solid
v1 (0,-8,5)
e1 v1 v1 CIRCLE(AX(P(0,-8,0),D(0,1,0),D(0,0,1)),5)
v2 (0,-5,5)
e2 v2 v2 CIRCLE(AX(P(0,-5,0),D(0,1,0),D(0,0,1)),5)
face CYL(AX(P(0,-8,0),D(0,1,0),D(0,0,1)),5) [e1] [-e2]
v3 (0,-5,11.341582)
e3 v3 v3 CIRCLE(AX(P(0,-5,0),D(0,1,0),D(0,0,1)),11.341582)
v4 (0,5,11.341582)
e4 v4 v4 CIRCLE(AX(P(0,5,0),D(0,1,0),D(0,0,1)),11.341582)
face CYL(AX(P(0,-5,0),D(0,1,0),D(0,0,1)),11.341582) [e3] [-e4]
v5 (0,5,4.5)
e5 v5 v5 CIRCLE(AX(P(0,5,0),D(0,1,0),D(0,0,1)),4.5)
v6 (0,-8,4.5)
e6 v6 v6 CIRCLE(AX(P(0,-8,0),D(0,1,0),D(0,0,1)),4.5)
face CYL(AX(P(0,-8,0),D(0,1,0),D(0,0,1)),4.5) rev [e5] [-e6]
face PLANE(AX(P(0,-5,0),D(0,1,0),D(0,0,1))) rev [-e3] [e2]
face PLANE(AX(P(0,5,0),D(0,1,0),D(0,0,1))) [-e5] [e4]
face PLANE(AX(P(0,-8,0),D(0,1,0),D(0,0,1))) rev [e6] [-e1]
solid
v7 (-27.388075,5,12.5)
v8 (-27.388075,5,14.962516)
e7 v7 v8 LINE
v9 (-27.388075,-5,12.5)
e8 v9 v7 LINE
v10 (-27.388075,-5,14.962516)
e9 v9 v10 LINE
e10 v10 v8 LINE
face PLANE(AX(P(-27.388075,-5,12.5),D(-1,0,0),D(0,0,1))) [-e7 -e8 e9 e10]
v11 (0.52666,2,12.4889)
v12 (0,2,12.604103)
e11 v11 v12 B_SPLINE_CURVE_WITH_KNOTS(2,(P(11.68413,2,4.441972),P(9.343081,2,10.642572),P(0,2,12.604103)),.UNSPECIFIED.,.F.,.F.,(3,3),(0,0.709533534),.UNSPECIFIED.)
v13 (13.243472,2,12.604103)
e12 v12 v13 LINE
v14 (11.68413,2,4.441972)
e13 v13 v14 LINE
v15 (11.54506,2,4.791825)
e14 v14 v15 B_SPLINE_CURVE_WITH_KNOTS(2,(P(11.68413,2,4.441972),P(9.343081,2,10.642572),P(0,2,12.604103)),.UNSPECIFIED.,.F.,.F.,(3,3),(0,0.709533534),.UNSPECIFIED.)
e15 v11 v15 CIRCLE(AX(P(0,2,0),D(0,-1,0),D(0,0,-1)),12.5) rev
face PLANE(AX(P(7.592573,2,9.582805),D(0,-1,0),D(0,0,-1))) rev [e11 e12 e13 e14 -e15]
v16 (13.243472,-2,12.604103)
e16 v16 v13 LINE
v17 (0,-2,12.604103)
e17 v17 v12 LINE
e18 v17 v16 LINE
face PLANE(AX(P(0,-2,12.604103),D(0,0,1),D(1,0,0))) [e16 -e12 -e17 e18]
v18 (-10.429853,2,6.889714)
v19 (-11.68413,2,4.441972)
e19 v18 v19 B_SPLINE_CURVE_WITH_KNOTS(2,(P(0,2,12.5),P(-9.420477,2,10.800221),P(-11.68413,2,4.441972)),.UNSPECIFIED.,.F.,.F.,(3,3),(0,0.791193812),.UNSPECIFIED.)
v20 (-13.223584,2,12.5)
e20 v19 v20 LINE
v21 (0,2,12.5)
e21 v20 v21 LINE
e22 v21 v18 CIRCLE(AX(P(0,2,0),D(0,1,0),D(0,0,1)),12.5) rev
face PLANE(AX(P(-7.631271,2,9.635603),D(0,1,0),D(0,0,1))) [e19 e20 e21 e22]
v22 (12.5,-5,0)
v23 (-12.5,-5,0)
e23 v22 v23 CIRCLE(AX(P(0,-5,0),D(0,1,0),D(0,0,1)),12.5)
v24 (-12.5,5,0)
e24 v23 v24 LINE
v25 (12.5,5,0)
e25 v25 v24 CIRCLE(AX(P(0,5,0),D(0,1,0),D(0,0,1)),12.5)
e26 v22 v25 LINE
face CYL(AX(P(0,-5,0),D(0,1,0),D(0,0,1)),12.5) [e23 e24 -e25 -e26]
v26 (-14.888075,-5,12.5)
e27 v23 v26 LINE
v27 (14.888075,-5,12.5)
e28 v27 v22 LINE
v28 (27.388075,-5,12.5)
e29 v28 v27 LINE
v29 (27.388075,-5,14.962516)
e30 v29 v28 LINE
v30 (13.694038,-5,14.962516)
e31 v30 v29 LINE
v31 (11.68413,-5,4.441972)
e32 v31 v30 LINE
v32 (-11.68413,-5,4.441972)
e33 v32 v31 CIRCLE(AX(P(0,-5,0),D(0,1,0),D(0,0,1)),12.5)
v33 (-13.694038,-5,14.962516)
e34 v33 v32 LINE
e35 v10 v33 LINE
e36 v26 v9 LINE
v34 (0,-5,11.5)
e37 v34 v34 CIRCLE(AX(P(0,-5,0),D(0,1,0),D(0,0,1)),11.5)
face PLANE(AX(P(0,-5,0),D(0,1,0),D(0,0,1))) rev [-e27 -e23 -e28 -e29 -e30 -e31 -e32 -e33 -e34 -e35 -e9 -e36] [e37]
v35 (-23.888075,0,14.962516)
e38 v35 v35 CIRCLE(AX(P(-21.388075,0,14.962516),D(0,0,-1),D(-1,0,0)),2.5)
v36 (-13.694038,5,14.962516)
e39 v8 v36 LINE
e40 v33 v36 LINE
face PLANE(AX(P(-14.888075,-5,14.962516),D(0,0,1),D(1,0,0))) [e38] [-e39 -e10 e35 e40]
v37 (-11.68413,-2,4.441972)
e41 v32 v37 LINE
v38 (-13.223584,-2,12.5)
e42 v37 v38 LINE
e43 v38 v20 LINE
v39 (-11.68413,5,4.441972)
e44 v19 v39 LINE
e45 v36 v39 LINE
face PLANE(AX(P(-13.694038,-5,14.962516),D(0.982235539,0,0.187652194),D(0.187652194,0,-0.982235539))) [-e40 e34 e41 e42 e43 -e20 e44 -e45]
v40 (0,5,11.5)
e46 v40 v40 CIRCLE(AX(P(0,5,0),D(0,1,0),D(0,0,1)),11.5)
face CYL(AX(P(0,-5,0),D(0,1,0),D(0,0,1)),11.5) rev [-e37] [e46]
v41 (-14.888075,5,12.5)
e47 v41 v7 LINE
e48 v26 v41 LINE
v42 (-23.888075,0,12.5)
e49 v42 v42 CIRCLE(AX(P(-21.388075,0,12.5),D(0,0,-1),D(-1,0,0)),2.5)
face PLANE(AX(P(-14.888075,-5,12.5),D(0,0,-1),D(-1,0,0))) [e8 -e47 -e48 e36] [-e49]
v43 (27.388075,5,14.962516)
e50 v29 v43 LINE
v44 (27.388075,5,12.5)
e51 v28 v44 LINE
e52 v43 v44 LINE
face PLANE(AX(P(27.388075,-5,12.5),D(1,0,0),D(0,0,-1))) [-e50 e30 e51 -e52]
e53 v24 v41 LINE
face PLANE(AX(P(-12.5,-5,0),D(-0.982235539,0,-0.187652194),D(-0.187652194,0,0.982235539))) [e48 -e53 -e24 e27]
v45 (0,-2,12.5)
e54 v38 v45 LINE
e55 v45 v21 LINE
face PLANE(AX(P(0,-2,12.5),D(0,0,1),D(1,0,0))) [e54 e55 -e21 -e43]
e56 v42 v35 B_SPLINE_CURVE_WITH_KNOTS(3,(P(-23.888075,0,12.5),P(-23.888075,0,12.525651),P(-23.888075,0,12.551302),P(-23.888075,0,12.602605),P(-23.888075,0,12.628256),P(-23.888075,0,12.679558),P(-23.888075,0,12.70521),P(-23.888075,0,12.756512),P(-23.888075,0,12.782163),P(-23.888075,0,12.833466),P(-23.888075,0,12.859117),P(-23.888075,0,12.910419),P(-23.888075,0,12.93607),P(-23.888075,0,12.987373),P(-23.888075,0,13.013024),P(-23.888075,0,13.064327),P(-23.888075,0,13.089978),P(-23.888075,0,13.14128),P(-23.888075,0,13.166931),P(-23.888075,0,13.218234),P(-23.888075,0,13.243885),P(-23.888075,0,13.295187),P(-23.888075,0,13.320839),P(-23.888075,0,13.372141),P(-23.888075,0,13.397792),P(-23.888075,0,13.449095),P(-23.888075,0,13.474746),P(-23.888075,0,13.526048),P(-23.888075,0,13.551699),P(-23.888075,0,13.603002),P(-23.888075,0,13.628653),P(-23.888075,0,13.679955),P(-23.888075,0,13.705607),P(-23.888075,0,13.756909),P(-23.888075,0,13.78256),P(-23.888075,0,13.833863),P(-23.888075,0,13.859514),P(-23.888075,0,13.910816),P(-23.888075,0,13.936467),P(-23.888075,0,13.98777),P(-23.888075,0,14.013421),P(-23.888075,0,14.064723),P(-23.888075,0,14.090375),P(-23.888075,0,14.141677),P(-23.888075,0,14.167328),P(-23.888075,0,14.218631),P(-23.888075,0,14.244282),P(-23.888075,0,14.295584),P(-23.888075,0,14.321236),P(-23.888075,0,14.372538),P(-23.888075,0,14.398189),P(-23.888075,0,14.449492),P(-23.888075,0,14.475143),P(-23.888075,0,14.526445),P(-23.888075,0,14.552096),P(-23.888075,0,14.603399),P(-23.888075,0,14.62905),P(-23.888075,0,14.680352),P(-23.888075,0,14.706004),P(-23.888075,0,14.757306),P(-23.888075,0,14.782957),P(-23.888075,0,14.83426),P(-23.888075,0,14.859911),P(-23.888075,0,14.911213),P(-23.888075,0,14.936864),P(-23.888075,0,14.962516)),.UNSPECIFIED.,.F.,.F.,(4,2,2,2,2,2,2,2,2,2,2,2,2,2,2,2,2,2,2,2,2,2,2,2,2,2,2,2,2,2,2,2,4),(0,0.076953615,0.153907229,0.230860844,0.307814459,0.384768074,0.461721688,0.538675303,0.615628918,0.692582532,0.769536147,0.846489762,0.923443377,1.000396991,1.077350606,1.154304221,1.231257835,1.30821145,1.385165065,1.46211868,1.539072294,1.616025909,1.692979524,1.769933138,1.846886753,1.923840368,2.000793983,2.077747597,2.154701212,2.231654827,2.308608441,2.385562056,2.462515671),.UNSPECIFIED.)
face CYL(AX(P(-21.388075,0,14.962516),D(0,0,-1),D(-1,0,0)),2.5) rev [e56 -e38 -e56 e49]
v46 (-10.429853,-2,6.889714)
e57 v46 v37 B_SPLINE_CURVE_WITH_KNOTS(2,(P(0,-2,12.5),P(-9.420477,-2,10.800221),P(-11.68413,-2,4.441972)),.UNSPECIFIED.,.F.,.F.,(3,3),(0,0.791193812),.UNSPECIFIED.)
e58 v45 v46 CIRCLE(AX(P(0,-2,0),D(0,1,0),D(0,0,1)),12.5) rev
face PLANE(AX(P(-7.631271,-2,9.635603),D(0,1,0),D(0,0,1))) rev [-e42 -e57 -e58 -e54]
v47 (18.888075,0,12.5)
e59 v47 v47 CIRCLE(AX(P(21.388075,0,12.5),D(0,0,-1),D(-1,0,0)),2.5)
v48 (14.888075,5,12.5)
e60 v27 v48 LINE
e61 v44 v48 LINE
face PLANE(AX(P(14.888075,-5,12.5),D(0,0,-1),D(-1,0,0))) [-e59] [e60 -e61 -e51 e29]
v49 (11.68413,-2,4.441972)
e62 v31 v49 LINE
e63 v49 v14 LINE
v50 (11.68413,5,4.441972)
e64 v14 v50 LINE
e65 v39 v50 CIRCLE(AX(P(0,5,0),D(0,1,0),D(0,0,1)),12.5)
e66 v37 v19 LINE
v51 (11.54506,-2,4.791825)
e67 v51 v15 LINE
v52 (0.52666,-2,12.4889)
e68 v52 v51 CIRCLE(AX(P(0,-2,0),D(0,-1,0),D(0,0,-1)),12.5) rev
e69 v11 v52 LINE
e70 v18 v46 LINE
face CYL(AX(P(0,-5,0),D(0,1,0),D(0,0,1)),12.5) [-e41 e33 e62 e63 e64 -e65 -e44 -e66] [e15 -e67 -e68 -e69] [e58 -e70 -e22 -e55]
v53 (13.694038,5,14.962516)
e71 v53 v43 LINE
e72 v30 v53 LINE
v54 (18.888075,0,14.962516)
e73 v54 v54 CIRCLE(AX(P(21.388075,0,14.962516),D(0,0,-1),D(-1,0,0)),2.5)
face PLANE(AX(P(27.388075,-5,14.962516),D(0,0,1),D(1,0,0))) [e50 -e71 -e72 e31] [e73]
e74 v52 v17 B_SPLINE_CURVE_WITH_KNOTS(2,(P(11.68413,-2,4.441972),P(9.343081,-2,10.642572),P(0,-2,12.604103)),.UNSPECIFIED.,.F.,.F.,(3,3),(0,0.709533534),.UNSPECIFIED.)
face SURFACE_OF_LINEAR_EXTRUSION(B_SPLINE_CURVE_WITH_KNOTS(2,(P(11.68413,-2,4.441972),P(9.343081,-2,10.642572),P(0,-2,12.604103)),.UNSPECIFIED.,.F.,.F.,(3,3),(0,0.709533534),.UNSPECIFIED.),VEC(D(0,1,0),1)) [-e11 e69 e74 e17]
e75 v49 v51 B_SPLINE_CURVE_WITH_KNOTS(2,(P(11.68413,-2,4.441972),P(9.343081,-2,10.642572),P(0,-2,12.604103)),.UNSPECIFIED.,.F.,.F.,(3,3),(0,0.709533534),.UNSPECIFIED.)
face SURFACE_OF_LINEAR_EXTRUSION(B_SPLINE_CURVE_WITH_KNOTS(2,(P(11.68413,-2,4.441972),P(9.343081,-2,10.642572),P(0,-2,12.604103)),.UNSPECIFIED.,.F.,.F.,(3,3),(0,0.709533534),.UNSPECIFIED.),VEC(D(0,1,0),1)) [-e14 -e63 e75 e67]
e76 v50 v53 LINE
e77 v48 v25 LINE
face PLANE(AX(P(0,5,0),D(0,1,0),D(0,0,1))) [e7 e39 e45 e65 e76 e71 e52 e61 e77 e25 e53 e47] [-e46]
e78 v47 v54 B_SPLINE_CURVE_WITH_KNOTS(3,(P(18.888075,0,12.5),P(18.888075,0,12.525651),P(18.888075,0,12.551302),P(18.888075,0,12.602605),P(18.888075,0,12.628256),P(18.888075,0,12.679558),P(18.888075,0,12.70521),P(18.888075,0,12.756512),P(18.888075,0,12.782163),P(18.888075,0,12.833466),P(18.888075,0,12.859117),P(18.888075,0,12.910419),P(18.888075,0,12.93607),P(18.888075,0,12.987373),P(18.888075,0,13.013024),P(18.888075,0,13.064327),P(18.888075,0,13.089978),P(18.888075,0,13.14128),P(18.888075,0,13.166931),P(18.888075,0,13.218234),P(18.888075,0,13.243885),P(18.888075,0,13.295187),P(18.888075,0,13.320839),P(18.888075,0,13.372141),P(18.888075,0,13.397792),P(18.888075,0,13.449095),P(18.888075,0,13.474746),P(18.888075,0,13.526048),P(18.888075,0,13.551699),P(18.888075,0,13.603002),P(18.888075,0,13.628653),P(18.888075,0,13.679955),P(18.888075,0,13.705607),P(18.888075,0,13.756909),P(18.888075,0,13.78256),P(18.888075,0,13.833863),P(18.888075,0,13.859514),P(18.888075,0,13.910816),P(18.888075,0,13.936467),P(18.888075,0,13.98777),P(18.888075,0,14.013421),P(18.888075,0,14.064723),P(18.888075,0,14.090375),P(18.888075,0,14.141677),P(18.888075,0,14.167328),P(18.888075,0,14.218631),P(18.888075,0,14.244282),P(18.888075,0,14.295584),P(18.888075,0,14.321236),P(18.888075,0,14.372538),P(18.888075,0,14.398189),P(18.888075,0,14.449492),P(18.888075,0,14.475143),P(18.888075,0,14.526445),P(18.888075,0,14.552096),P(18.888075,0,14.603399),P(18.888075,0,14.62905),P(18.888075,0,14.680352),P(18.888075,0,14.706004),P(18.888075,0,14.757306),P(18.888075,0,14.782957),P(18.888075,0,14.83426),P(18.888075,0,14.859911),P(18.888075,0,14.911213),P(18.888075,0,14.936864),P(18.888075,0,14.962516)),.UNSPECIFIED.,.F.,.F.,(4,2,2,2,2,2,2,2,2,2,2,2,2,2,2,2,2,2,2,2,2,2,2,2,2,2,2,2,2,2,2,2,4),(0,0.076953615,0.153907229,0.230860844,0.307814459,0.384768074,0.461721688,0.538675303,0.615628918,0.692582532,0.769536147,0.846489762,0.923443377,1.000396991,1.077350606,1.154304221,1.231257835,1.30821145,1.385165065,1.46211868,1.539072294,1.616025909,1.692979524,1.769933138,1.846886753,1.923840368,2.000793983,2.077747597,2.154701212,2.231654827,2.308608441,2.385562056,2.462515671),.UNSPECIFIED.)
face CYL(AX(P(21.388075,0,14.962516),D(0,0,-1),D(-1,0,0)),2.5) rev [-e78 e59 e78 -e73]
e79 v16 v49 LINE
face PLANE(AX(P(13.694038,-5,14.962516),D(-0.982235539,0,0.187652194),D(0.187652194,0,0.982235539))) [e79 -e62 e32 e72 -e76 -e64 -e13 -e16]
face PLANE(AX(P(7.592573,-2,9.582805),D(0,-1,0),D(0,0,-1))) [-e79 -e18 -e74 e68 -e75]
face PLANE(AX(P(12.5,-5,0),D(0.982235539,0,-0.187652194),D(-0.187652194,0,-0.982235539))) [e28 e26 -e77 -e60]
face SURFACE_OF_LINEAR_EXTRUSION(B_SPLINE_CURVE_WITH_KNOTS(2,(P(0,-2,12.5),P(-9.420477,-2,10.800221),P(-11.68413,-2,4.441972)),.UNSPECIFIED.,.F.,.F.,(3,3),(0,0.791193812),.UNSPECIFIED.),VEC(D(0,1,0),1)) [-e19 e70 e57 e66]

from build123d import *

# Parameters (mm, degrees)
BOSS_EXTRUDE1_DEPTH      = 5
BOSS_EXTRUDE1_DEPTH_BACK = 5
SKETCH1_R                = 11.5
BOSS_EXTRUDE2_START      = -2
BOSS_EXTRUDE2_DEPTH      = 4
BOSS_EXTRUDE3_DEPTH      = 2
BOSS_EXTRUDE3_DEPTH_BACK = 2
BOSS_EXTRUDE4_DEPTH      = 5
BOSS_EXTRUDE4_DEPTH_BACK = 5
SKETCH5_R                = 11.341581645
SKETCH5_R_2              = 10.881998828
BOSS_EXTRUDE5_DEPTH      = 5
BOSS_EXTRUDE5_DEPTH_BACK = 5
SKETCH6_R                = 10.881998828
SKETCH6_R_2              = 5
BOSS_EXTRUDE6_DEPTH      = 5
BOSS_EXTRUDE6_DEPTH_BACK = 8
SKETCH7_R                = 5
SKETCH7_R_2              = 4.5
CUT_EXTRUDE1_DEPTH       = 38.935559418
CUT_EXTRUDE1_DEPTH_BACK  = 38.935559418
SKETCH8_R                = 2.5


# Read off the part's stored shape, not the designer's step: Boss-Extrude2
with BuildPart() as part:
    # Sketch1 → Boss-Extrude1 (new, two sides: drawn at the far end of the back side and taken through both)
    with BuildSketch(Plane(origin=(0, 0, 0), x_dir=(1, 0, 0), z_dir=(0, 1, 0)).offset(-BOSS_EXTRUDE1_DEPTH_BACK)):
        with BuildLine():
            Line((-12.5, 0), (-14.888075294, -12.5))
            Line((-14.888075294, -12.5), (-27.388075294, -12.5))
            Line((-27.388075294, -12.5), (-27.388075294, -14.962515671))
            Line((-27.388075294, -14.962515671), (-14.888075294, -14.962515671))
            Line((-14.888075294, -14.962515671), (-13.694037647, -14.962515671))
            Line((-13.694037647, -14.962515671), (-11.684129612, -4.441971995))
            ThreePointArc((-11.684129612, -4.441971995), (0, -12.5), (11.684129612, -4.441971995))
            Line((11.684129612, -4.441971995), (13.694037647, -14.962515671))
            Line((13.694037647, -14.962515671), (14.888075294, -14.962515671))
            Line((14.888075294, -14.962515671), (27.388075294, -14.962515671))
            Line((27.388075294, -14.962515671), (27.388075294, -12.5))
            Line((27.388075294, -12.5), (14.888075294, -12.5))
            Line((14.888075294, -12.5), (12.5, 0))
            ThreePointArc((12.5, 0), (0, 12.5), (-12.5, 0))
        make_face()
        with Locations(Location((0, 0, 0), (0, 0, 270))):
            Circle(SKETCH1_R, mode=Mode.SUBTRACT)
    extrude(amount=BOSS_EXTRUDE1_DEPTH + BOSS_EXTRUDE1_DEPTH_BACK)

    # Boss-Extrude2 outline → Boss-Extrude2 (add)
    with BuildSketch(Plane(origin=(0, 0, 0), x_dir=(1, 0, 0), z_dir=(0, 1, 0)).offset(BOSS_EXTRUDE2_START)):
        with BuildLine():
            ThreePointArc((11.545060202, -4.7918248), (7.158411272, -10.247299549), (0.526660373, -12.488900226))
            add(Edge.make_bspline(
                [(0.526660373, -12.488900226), (0.266171619, -12.548222015), (0, -12.604103366)],
                knots=[0.689319893, 0.689319893, 0.689319893, 0.709533534, 0.709533534, 0.709533534], degree=2))
            Line((0, -12.604103366), (13.243472354, -12.604103366))
            Line((13.243472354, -12.604103366), (11.684129612, -4.441971995))
            add(Edge.make_bspline(
                [(11.684129612, -4.441971995), (11.61743634, -4.618618616), (11.545060202, -4.7918248)],
                knots=[0, 0, 0, 0.020213641, 0.020213641, 0.020213641], degree=2))
        make_face()
    extrude(amount=BOSS_EXTRUDE2_DEPTH)

    # Sketch4 → Boss-Extrude3 (add, two sides: drawn at the far end of the back side and taken through both)
    with BuildSketch(Plane(origin=(0, 0, 0), x_dir=(1, 0, 0), z_dir=(0, 1, 0)).offset(-BOSS_EXTRUDE3_DEPTH_BACK)):
        with BuildLine():
            Line((0, -12.5), (-13.22358382, -12.5))
            Line((-13.22358382, -12.5), (-11.684129612, -4.441971995))
            add(Edge.make_bspline(
                [(0, -12.5), (-9.420476938, -10.800220507), (-11.684129612, -4.441971995)],
                knots=[0, 0, 0, 0.791193812, 0.791193812, 0.791193812], degree=2))
        make_face()
    extrude(amount=BOSS_EXTRUDE3_DEPTH + BOSS_EXTRUDE3_DEPTH_BACK)

    # Sketch8 → Cut-Extrude1 (cut, two sides: drawn at the far end of the back side and taken through both)
    with BuildSketch(Plane(origin=(0, 0, 12.5), x_dir=(-1, 0, 0), z_dir=(0, 0, -1)).offset(-CUT_EXTRUDE1_DEPTH_BACK)):
        with Locations((21.388075294, 0)):
            Circle(SKETCH8_R)
        with Locations((-21.388075294, 0)):
            Circle(SKETCH8_R)
    extrude(amount=CUT_EXTRUDE1_DEPTH + CUT_EXTRUDE1_DEPTH_BACK, mode=Mode.SUBTRACT)


with BuildPart() as body_2:
    # Sketch5 → Boss-Extrude4 (new, two sides: drawn at the far end of the back side and taken through both)
    with BuildSketch(Plane(origin=(0, 0, 0), x_dir=(1, 0, 0), z_dir=(0, 1, 0)).offset(-BOSS_EXTRUDE4_DEPTH_BACK)):
        with Locations(Location((0, 0, 0), (0, 0, 270))):
            Circle(SKETCH5_R)
        with Locations(Location((0, 0, 0), (0, 0, 270))):
            Circle(SKETCH5_R_2, mode=Mode.SUBTRACT)
    extrude(amount=BOSS_EXTRUDE4_DEPTH + BOSS_EXTRUDE4_DEPTH_BACK)



with BuildPart() as body_3:
    # Sketch6 → Boss-Extrude5 (new, two sides: drawn at the far end of the back side and taken through both)
    with BuildSketch(Plane(origin=(0, 0, 0), x_dir=(1, 0, 0), z_dir=(0, 1, 0)).offset(-BOSS_EXTRUDE5_DEPTH_BACK)):
        with Locations(Location((0, 0, 0), (0, 0, 270))):
            Circle(SKETCH6_R)
        with Locations(Location((0, 0, 0), (0, 0, 270))):
            Circle(SKETCH6_R_2, mode=Mode.SUBTRACT)
    extrude(amount=BOSS_EXTRUDE5_DEPTH + BOSS_EXTRUDE5_DEPTH_BACK)


with BuildPart() as body_2_1:
    add(body_2.part)

    add(body_3.part)  # Boss-Extrude6 merges body 3
    # Sketch7 → Boss-Extrude6 (add, two sides: drawn at the far end of the back side and taken through both)
    with BuildSketch(Plane(origin=(0, 0, 0), x_dir=(1, 0, 0), z_dir=(0, 1, 0)).offset(-BOSS_EXTRUDE6_DEPTH_BACK)):
        with Locations(Location((0, 0, 0), (0, 0, 270))):
            Circle(SKETCH7_R)
        with Locations(Location((0, 0, 0), (0, 0, 270))):
            Circle(SKETCH7_R_2, mode=Mode.SUBTRACT)
    extrude(amount=BOSS_EXTRUDE6_DEPTH + BOSS_EXTRUDE6_DEPTH_BACK)


solid = Compound([part.part, body_2_1.part])
